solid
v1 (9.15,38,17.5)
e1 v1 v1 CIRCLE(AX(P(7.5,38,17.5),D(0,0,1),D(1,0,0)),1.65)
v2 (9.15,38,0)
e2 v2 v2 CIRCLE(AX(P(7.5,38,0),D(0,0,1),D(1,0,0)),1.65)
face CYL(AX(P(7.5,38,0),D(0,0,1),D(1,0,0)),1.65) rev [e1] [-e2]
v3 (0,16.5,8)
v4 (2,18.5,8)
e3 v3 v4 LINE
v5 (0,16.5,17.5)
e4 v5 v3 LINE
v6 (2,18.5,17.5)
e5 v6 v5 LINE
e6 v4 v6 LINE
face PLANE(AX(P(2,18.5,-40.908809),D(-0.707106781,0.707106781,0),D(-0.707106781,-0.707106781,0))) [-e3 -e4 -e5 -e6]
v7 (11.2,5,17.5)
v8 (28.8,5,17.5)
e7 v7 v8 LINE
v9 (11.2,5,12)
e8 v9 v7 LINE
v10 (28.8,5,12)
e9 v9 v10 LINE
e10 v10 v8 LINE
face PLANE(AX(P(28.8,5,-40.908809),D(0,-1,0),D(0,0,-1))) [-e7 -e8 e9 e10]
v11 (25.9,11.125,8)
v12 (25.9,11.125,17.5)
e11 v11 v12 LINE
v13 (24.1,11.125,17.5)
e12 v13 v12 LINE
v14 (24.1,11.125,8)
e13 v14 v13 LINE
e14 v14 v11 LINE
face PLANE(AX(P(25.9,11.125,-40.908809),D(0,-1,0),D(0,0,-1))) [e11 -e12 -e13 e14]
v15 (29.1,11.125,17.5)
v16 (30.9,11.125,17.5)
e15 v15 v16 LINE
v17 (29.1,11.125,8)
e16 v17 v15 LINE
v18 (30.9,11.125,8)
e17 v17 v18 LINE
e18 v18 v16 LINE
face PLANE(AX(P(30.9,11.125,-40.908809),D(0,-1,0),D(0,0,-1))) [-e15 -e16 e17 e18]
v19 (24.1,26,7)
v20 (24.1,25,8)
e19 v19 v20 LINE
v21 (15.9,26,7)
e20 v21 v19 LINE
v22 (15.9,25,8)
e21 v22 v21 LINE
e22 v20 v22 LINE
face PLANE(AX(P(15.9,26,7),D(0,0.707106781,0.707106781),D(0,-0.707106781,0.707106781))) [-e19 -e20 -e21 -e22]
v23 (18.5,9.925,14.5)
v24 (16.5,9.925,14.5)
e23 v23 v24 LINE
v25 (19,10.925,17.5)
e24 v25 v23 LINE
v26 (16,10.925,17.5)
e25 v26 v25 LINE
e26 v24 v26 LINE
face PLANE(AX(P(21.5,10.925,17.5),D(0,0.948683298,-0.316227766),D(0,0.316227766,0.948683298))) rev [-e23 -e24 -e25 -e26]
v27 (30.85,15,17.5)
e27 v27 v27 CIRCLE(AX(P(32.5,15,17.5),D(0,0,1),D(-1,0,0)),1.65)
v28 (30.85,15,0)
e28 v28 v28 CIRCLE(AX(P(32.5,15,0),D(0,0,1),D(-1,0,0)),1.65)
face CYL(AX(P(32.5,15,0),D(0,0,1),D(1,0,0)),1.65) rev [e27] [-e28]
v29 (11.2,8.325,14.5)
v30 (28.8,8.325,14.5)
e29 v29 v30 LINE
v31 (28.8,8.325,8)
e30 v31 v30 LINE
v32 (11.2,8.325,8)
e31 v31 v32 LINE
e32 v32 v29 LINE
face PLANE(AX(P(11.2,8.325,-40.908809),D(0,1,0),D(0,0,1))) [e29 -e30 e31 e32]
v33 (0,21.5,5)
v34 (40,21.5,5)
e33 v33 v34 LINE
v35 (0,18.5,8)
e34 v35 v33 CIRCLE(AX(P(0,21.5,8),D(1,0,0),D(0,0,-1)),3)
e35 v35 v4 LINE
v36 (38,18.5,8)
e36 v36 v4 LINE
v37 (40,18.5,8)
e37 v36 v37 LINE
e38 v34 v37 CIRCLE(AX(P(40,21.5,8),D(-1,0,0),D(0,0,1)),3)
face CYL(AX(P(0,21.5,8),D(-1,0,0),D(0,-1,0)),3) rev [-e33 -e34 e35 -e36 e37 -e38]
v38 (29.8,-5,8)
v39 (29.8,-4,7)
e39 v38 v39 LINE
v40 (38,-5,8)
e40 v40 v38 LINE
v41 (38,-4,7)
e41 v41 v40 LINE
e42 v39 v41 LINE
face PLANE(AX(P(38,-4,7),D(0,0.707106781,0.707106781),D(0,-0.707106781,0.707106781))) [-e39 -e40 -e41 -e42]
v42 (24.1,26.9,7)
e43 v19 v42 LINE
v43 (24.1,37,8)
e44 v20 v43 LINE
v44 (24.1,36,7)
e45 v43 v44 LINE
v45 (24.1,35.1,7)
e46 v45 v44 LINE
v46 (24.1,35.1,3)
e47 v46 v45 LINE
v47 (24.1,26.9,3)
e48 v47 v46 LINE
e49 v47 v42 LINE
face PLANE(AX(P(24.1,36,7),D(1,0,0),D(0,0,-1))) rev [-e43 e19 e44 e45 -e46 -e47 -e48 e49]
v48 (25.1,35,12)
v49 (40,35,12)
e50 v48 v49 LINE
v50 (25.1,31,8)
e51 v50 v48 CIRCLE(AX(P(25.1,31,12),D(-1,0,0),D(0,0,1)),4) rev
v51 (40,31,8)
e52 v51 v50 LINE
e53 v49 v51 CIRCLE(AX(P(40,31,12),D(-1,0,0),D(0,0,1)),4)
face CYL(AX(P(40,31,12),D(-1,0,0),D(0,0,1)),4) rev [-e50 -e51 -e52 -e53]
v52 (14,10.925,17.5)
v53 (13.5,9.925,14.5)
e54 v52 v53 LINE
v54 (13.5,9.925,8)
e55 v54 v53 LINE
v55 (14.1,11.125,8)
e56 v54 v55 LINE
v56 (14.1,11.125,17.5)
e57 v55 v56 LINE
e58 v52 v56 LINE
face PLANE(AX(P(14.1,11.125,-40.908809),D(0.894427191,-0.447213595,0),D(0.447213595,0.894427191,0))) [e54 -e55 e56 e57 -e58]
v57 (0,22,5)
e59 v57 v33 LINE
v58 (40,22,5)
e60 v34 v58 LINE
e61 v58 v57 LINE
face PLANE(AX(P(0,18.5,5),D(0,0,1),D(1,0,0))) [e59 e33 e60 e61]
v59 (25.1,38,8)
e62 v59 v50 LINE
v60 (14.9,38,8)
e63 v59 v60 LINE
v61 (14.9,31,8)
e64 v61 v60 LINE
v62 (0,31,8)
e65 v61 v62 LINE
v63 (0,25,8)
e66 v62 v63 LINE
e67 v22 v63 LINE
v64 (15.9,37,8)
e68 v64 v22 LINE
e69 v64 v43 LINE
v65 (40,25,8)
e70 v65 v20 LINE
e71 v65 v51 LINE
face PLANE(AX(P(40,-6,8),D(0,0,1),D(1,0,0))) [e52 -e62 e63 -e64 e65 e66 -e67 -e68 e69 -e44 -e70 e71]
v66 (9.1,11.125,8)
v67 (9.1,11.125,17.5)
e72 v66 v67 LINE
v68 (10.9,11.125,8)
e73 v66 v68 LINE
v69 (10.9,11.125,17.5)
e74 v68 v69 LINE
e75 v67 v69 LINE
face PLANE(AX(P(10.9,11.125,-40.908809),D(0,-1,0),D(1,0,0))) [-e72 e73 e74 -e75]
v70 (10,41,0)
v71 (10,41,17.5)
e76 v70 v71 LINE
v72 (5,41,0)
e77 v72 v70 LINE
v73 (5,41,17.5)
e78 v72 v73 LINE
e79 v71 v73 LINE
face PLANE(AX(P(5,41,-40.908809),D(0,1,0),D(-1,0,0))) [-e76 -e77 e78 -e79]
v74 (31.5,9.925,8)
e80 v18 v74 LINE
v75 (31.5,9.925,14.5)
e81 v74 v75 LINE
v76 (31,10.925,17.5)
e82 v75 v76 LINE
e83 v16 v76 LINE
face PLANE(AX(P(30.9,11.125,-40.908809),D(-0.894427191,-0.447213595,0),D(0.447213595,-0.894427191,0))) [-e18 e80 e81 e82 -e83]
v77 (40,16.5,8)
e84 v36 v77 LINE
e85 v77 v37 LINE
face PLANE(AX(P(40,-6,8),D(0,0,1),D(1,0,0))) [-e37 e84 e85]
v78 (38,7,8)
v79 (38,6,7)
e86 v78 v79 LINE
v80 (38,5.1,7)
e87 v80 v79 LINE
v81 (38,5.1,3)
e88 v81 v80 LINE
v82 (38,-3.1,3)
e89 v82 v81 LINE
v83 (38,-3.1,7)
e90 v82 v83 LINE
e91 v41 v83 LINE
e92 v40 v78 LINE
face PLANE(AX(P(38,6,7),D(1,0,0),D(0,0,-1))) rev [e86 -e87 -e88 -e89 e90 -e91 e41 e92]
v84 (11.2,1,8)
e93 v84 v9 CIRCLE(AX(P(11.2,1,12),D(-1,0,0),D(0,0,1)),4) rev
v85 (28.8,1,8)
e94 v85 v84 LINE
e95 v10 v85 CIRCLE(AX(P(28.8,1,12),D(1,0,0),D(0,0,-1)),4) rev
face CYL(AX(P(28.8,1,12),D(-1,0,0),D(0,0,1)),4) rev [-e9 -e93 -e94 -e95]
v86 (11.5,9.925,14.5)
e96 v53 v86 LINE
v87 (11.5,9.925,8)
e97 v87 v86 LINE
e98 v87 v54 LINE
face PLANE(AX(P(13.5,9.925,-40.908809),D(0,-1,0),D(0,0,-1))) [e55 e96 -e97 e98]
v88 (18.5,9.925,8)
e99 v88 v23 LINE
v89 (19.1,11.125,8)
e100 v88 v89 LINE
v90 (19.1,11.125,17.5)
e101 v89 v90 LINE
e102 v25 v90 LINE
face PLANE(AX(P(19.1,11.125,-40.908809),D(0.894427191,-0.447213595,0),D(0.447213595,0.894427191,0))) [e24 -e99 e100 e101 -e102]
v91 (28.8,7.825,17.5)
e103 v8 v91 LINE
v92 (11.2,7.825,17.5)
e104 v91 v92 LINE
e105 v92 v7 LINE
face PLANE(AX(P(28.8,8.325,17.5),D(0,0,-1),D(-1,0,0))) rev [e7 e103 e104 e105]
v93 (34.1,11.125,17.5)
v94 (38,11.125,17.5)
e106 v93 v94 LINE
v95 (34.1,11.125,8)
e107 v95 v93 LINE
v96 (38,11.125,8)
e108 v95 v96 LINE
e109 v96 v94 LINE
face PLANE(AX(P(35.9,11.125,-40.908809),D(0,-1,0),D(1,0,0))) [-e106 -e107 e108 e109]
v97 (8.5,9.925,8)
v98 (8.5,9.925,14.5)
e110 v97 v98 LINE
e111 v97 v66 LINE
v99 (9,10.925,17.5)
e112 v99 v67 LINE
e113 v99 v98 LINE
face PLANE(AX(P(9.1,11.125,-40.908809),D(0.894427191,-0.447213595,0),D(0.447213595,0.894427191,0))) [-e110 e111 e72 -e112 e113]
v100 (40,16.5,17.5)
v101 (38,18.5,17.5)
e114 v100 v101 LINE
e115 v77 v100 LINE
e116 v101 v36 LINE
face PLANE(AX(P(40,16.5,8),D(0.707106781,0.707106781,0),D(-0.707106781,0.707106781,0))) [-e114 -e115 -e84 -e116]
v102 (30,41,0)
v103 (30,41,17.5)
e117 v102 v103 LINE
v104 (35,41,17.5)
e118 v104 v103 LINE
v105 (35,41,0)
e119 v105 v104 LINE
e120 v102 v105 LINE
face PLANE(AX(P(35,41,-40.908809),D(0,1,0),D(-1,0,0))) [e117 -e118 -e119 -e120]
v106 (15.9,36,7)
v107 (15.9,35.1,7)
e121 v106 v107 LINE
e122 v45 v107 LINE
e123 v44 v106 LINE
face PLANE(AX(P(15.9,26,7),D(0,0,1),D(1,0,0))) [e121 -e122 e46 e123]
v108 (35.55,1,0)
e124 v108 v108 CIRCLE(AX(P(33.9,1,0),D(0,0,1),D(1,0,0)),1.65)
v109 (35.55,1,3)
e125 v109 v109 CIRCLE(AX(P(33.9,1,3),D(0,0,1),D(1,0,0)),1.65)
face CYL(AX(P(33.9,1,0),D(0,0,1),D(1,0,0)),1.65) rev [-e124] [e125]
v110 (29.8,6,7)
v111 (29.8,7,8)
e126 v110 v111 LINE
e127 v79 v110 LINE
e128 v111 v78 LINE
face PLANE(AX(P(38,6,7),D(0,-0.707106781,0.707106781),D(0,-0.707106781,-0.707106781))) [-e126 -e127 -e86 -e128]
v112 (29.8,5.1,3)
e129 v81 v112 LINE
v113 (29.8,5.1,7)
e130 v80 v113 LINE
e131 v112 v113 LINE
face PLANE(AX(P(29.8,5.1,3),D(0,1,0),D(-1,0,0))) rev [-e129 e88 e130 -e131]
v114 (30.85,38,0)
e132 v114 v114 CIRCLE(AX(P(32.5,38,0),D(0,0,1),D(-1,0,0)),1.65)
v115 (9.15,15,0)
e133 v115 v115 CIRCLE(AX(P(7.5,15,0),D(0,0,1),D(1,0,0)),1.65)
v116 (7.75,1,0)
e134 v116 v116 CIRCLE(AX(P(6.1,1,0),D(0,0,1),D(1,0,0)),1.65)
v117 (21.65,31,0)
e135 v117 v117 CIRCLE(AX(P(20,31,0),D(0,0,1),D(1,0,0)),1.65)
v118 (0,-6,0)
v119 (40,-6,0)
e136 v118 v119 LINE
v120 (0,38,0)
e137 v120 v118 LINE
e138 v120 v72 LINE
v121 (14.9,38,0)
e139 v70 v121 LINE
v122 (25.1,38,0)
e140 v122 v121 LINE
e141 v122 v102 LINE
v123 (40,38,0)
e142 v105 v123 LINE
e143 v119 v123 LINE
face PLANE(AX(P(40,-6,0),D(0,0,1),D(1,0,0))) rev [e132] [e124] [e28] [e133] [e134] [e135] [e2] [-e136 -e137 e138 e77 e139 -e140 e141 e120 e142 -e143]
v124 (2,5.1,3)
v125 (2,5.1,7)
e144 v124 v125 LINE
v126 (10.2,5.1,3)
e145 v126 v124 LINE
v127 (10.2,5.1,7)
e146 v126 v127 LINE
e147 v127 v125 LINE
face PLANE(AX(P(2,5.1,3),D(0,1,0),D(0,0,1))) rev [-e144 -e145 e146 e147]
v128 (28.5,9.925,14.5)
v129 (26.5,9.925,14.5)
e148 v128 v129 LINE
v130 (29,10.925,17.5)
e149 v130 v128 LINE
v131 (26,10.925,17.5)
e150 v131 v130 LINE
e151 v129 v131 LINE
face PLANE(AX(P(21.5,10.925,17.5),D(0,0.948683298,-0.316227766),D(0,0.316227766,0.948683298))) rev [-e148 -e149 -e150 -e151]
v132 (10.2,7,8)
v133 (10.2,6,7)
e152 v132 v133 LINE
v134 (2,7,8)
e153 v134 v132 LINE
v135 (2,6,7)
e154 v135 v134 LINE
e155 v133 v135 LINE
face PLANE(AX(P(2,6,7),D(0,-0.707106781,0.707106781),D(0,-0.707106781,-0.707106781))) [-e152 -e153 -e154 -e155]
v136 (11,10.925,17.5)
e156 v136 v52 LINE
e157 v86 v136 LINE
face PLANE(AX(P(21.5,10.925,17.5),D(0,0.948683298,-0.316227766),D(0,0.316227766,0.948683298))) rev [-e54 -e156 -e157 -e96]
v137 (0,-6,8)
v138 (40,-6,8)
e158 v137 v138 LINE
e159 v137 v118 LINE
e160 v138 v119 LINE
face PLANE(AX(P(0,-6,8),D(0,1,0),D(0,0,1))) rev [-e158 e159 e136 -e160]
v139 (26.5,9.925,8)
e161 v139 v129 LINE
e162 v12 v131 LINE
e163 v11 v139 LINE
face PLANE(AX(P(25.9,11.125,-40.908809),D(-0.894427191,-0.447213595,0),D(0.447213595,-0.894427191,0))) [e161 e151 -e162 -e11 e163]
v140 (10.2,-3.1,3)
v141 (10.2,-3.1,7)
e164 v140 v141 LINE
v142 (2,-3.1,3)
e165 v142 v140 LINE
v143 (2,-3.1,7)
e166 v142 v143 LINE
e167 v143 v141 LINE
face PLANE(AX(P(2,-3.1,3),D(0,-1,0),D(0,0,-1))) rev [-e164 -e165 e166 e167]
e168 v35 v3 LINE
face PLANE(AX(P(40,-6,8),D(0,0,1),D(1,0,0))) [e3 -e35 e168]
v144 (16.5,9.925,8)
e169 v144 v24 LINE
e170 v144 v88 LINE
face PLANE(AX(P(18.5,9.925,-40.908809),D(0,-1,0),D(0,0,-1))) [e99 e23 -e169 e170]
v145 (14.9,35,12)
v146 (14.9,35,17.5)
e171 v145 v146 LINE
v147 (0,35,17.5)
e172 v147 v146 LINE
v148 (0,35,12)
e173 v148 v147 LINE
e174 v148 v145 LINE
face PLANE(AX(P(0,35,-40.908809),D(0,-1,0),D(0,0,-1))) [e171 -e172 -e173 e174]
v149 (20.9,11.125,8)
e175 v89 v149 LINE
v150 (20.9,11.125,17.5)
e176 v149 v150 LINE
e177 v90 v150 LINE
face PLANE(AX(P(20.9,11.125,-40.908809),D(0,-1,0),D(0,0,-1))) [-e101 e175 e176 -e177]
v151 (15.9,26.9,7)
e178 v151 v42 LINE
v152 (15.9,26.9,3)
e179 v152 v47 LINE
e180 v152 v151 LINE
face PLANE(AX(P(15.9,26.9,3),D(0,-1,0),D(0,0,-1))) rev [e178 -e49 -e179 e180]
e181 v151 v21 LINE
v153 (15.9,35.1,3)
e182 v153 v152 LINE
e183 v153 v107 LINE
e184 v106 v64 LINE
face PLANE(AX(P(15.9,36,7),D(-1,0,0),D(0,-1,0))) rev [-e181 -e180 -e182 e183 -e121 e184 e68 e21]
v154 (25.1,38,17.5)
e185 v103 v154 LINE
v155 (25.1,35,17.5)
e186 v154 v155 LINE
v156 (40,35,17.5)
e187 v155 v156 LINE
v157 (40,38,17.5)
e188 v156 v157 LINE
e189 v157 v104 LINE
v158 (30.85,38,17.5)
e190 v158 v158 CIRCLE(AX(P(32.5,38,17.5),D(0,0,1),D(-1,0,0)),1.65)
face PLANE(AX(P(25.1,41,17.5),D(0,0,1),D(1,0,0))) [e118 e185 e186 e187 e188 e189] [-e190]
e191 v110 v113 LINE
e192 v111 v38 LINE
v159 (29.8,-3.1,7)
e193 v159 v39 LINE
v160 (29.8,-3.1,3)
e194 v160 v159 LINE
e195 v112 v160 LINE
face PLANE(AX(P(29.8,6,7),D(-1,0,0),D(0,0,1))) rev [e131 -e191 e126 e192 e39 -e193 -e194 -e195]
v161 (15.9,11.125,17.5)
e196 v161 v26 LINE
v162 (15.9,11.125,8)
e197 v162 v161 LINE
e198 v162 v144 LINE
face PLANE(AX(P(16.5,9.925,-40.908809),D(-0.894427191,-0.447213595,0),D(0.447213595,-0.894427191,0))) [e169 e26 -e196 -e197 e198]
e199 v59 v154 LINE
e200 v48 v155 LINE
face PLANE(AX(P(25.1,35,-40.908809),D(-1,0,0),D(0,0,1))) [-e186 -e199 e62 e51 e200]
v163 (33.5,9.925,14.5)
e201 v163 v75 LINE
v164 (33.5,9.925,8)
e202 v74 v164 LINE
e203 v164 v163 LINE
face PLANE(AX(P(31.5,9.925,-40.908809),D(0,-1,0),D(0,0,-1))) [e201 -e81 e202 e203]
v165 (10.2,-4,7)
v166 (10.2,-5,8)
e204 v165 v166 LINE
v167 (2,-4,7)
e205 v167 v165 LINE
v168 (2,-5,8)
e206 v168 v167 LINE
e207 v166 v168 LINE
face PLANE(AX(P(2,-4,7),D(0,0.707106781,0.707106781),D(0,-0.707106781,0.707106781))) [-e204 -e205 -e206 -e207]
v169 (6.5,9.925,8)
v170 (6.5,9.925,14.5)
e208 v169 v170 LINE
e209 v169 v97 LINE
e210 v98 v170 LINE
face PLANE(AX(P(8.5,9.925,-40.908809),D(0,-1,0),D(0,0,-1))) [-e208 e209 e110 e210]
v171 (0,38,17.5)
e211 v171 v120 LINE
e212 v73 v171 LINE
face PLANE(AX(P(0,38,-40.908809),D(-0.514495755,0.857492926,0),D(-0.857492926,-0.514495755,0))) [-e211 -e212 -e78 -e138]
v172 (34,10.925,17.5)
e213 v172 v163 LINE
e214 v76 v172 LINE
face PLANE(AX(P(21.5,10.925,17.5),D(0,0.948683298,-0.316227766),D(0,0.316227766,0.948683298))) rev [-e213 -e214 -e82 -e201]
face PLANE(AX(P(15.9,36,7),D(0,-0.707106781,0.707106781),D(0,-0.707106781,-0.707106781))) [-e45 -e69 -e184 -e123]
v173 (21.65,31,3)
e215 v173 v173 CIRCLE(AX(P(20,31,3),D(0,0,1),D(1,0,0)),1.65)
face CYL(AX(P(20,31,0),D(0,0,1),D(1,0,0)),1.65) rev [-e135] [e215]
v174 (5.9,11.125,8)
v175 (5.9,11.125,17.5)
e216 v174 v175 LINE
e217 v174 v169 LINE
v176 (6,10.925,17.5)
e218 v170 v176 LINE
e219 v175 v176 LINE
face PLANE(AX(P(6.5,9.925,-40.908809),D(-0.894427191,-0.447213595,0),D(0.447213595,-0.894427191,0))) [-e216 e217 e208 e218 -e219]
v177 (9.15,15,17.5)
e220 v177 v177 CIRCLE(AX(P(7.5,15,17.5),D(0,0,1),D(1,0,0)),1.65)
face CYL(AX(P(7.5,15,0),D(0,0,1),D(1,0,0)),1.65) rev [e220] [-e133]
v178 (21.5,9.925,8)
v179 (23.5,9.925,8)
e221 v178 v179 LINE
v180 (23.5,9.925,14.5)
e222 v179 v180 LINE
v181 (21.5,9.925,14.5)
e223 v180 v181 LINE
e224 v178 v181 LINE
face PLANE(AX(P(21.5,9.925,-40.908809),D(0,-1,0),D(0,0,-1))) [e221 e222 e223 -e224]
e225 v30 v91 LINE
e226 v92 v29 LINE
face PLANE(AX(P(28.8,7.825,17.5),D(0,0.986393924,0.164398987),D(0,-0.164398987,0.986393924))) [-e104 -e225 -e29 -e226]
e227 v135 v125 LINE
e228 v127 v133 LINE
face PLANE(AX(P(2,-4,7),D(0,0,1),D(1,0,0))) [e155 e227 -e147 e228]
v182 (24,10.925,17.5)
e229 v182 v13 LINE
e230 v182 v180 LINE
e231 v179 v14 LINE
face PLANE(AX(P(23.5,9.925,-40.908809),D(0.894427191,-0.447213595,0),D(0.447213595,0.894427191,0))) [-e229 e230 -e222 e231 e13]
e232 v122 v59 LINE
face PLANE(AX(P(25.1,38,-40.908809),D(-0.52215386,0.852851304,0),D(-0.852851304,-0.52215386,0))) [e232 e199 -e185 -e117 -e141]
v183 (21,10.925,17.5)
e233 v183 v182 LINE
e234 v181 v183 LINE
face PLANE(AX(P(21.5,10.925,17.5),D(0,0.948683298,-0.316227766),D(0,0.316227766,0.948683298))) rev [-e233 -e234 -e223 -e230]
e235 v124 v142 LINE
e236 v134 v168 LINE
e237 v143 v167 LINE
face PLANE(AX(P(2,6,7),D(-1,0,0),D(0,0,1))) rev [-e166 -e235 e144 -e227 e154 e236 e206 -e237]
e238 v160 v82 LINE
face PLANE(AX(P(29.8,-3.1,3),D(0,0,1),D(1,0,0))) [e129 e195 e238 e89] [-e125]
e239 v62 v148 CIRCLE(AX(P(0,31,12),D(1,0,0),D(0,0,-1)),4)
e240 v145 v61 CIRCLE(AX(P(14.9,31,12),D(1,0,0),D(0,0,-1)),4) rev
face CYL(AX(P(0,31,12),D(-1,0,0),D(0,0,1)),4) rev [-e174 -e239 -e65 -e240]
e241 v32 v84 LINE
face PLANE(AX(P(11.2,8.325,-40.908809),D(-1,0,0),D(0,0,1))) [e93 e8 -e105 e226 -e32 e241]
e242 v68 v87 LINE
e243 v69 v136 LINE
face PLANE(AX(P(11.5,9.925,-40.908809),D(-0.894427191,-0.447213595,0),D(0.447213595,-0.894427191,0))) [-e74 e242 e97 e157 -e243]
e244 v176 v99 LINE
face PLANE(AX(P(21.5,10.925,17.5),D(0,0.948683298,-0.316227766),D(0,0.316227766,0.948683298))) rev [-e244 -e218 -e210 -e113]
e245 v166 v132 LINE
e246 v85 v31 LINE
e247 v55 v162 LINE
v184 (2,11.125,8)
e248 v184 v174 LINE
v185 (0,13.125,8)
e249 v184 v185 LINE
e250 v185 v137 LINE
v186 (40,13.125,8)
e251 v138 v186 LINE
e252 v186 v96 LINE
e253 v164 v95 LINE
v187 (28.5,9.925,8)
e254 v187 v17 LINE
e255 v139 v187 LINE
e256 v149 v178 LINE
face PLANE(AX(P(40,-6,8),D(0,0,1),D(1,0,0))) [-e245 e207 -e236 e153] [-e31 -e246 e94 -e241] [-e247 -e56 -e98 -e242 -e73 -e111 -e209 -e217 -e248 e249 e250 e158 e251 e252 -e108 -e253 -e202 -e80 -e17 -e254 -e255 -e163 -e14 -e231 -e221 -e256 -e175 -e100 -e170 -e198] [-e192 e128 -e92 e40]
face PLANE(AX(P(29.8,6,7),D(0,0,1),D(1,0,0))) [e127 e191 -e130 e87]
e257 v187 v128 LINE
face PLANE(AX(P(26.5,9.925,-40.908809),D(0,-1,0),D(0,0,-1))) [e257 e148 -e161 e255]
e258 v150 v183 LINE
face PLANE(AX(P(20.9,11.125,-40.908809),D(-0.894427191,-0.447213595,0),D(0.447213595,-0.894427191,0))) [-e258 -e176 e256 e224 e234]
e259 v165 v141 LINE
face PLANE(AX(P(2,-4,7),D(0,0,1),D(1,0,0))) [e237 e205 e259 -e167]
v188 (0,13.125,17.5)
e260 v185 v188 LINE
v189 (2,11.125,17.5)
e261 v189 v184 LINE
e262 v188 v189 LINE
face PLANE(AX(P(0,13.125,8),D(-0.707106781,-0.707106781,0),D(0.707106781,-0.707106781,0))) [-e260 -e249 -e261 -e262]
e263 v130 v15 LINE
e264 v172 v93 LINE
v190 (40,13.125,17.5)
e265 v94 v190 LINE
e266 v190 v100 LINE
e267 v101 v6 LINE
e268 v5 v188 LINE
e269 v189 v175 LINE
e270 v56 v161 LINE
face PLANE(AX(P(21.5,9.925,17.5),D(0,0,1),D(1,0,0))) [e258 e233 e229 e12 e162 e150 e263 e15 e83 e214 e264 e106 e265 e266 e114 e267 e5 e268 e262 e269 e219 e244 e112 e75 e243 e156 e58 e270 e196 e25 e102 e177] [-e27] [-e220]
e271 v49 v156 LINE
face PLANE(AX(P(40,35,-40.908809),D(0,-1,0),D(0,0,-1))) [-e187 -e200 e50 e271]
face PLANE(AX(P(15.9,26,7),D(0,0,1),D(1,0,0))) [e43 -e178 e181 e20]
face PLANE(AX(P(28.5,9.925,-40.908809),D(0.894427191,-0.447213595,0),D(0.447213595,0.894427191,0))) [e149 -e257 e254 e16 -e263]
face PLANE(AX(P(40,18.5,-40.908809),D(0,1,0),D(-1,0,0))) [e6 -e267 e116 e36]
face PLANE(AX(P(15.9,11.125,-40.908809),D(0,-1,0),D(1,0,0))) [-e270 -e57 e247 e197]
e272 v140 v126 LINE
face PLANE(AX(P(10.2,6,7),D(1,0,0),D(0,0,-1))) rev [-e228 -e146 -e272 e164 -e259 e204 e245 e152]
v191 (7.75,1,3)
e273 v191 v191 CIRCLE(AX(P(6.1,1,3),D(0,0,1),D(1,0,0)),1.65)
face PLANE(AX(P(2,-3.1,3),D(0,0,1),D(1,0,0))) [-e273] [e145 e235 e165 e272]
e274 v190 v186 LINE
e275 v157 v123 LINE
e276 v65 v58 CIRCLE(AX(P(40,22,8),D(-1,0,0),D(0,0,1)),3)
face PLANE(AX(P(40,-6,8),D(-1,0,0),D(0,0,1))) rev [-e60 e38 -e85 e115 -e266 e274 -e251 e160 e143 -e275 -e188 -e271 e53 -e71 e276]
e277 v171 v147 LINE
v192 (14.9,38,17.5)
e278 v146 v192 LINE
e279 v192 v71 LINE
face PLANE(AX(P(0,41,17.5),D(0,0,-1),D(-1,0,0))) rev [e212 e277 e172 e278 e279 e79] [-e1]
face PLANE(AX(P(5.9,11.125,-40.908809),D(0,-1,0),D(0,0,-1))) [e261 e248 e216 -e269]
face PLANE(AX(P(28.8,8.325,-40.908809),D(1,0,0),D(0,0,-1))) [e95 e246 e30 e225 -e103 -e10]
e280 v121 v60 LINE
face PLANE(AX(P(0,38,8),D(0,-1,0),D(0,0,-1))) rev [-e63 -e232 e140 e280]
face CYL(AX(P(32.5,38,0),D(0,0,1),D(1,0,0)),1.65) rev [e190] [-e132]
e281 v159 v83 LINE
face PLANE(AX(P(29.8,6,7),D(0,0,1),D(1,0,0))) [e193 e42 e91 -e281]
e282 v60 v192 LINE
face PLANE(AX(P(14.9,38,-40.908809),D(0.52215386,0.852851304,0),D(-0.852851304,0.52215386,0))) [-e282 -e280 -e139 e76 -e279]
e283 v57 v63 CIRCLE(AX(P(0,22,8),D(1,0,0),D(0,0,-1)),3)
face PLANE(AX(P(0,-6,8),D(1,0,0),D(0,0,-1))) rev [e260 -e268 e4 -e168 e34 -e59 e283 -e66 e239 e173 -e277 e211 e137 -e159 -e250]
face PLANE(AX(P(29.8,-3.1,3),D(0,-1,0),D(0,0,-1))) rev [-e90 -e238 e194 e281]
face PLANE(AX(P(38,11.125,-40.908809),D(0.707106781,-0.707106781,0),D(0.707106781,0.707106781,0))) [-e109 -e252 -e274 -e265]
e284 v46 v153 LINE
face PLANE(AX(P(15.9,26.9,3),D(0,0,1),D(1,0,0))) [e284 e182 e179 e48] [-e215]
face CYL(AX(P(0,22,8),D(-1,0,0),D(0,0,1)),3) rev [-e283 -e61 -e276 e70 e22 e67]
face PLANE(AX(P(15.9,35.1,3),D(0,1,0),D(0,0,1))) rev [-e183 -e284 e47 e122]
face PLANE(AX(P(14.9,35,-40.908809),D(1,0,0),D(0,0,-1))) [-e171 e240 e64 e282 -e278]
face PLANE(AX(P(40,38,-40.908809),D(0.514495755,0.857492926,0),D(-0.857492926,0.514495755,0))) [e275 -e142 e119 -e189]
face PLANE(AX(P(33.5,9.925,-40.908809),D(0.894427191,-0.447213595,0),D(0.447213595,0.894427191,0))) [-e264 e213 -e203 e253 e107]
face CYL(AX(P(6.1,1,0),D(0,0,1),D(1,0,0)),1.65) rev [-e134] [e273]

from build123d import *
from OCP.BRepFilletAPI import BRepFilletAPI_MakeChamfer

# Parameters (mm, degrees)
SKETCH1_W                       = 40
SKETCH1_H                       = 44
BOSS_EXTRUDE1_DEPTH             = 8
SKETCH2_W                       = 8.2
SKETCH2_H                       = 10
CUT_EXTRUDE1_DEPTH              = 1
SKETCH3_W                       = 8.2
SKETCH3_H                       = 8.2
CUT_EXTRUDE2_DEPTH              = 4
CHAMFER1_SIZE                   = 1
SKETCH4_R                       = 1.65
CUT_EXTRUDE3_DEPTH              = 56.398555938
SKETCH5_W                       = 17.6
SKETCH5_H                       = 3.325
BOSS_EXTRUDE2_DEPTH             = 9.5
BOSS_EXTRUDE2_DIRECTION_2_REACH = 57.749
FILLET1_R                       = 4
SKETCH6_R                       = 1.65
CUT_EXTRUDE4_DEPTH              = 60.893655758
CHAMFER2_SIZE                   = 2
SKETCH7_W                       = 40
SKETCH7_H                       = 6.5
CUT_EXTRUDE5_DEPTH              = 3
FILLET2_R                       = 3
CHAMFER3_SIZE                   = 3
CHAMFER3_SIZE2                  = 1
CHAMFER4_SIZE                   = 3
CHAMFER4_SIZE2                  = 0.5


with BuildPart() as part:
    # Sketch1 → Boss-Extrude1 (new body)
    with BuildSketch(Plane.XY):
        with Locations((20, 16)):
            Rectangle(SKETCH1_W, SKETCH1_H)
    extrude(amount=BOSS_EXTRUDE1_DEPTH)

    # Sketch2 → Cut-Extrude1 (cut)
    with BuildSketch(Plane.XY.offset(8)):
        with Locations((20, 31)):
            Rectangle(SKETCH2_W, SKETCH2_H)
        with Locations((6.1, 1)):
            Rectangle(SKETCH2_W, SKETCH2_H)
        with Locations((33.9, 1)):
            Rectangle(SKETCH2_W, SKETCH2_H)
    extrude(amount=-CUT_EXTRUDE1_DEPTH, mode=Mode.SUBTRACT)

    # Sketch3 → Cut-Extrude2 (cut)
    with BuildSketch(Plane.XY.offset(7)):
        with Locations((20, 31)):
            Rectangle(SKETCH3_W, SKETCH3_H)
        with Locations((6.1, 1)):
            Rectangle(SKETCH3_W, SKETCH3_H)
        with Locations((33.9, 1)):
            Rectangle(SKETCH3_W, SKETCH3_H)
    extrude(amount=-CUT_EXTRUDE2_DEPTH, mode=Mode.SUBTRACT)

    # Chamfer1
    chamfer1_edges = [part.edges().sort_by_distance(p)[0] for p in [
        (20, 26, 8),
        (20, 36, 8),
        (33.9, -4, 8),
        (33.9, 6, 8),
        (6.1, -4, 8),
        (6.1, 6, 8),
    ]]
    chamfer(chamfer1_edges, length=CHAMFER1_SIZE - 0.0001)  # a hair under: the kernel refuses the full size

    # Sketch4 → Cut-Extrude3 (cut, through all)
    with BuildSketch(Plane.XY.offset(3)):
        with Locations((20, 31)):
            Circle(SKETCH4_R)
        with Locations((6.1, 1)):
            Circle(SKETCH4_R)
        with Locations((33.9, 1)):
            Circle(SKETCH4_R)
    extrude(amount=-CUT_EXTRUDE3_DEPTH, mode=Mode.SUBTRACT)

    # Sketch5 → Boss-Extrude2 (add)
    with BuildSketch(Plane.XY.offset(8)):
        Polygon((20.9, 11.125), (19.1, 11.125), (18.5, 9.925), (16.5, 9.925), (15.9, 11.125), (14.1, 11.125), (13.5, 9.925), (11.5, 9.925), (10.9, 11.125), (9.1, 11.125), (8.5, 9.925), (6.5, 9.925), (5.9, 11.125), (4.1, 11.125), (0, 11.125), (0, 18.5), (40, 18.5), (40, 11.125), (35.9, 11.125), (34.1, 11.125), (33.5, 9.925), (31.5, 9.925), (30.9, 11.125), (29.1, 11.125), (28.5, 9.925), (26.5, 9.925), (25.9, 11.125), (24.1, 11.125), (23.5, 9.925), (21.5, 9.925), align=None)
        with Locations((20, 6.6625)):
            Rectangle(SKETCH5_W, SKETCH5_H)
        Polygon((0, 35), (14.9, 35), (14.9, 38), (10, 41), (5, 41), (0, 38), align=None)
        Polygon((25.1, 38), (30, 41), (35, 41), (40, 38), (40, 35), (25.1, 35), align=None)
    extrude(amount=BOSS_EXTRUDE2_DEPTH)

    # Boss-Extrude2 direction 2: up to this face of the body (flat: up to its plane)
    boss_extrude2_direction_2_end = Plane(part.part.faces().sort_by_distance((20, 16.073973219, 0))[0])
    # Sketch5 → Boss-Extrude2 direction 2 (add, up to the picked face)
    with BuildSketch(Plane.XY.offset(8), mode=Mode.PRIVATE) as boss_extrude2_direction_2_sk1:
        Polygon((20.9, 11.125), (19.1, 11.125), (18.5, 9.925), (16.5, 9.925), (15.9, 11.125), (14.1, 11.125), (13.5, 9.925), (11.5, 9.925), (10.9, 11.125), (9.1, 11.125), (8.5, 9.925), (6.5, 9.925), (5.9, 11.125), (4.1, 11.125), (0, 11.125), (0, 18.5), (40, 18.5), (40, 11.125), (35.9, 11.125), (34.1, 11.125), (33.5, 9.925), (31.5, 9.925), (30.9, 11.125), (29.1, 11.125), (28.5, 9.925), (26.5, 9.925), (25.9, 11.125), (24.1, 11.125), (23.5, 9.925), (21.5, 9.925), align=None)
    boss_extrude2_direction_2_tool1 = split(extrude(boss_extrude2_direction_2_sk1.sketch, amount=-BOSS_EXTRUDE2_DIRECTION_2_REACH, mode=Mode.PRIVATE), bisect_by=boss_extrude2_direction_2_end, keep=Keep.BOTH, mode=Mode.PRIVATE)
    # Sketch5 → Boss-Extrude2 direction 2 (add, up to the picked face)
    with BuildSketch(Plane.XY.offset(8), mode=Mode.PRIVATE) as boss_extrude2_direction_2_sk2:
        with Locations((20, 6.6625)):
            Rectangle(SKETCH5_W, SKETCH5_H)
    boss_extrude2_direction_2_tool2 = split(extrude(boss_extrude2_direction_2_sk2.sketch, amount=-BOSS_EXTRUDE2_DIRECTION_2_REACH, mode=Mode.PRIVATE), bisect_by=boss_extrude2_direction_2_end, keep=Keep.BOTH, mode=Mode.PRIVATE)
    # Sketch5 → Boss-Extrude2 direction 2 (add, up to the picked face)
    with BuildSketch(Plane.XY.offset(8), mode=Mode.PRIVATE) as boss_extrude2_direction_2_sk3:
        Polygon((0, 35), (14.9, 35), (14.9, 38), (10, 41), (5, 41), (0, 38), align=None)
    boss_extrude2_direction_2_tool3 = split(extrude(boss_extrude2_direction_2_sk3.sketch, amount=-BOSS_EXTRUDE2_DIRECTION_2_REACH, mode=Mode.PRIVATE), bisect_by=boss_extrude2_direction_2_end, keep=Keep.BOTH, mode=Mode.PRIVATE)
    # Sketch5 → Boss-Extrude2 direction 2 (add, up to the picked face)
    with BuildSketch(Plane.XY.offset(8), mode=Mode.PRIVATE) as boss_extrude2_direction_2_sk4:
        Polygon((25.1, 38), (30, 41), (35, 41), (40, 38), (40, 35), (25.1, 35), align=None)
    boss_extrude2_direction_2_tool4 = split(extrude(boss_extrude2_direction_2_sk4.sketch, amount=-BOSS_EXTRUDE2_DIRECTION_2_REACH, mode=Mode.PRIVATE), bisect_by=boss_extrude2_direction_2_end, keep=Keep.BOTH, mode=Mode.PRIVATE)
    add(boss_extrude2_direction_2_tool1.solids().sort_by(Axis((20, 14.559414, 8), (0, 0, -1)))[0])
    add(boss_extrude2_direction_2_tool2.solids().sort_by(Axis((20, 6.6625, 8), (0, 0, -1)))[0])
    add(boss_extrude2_direction_2_tool3.solids().sort_by(Axis((7.45835, 37.60161, 8), (0, 0, -1)))[0])
    add(boss_extrude2_direction_2_tool4.solids().sort_by(Axis((32.54165, 37.60161, 8), (0, 0, -1)))[0])

    # Fillet1
    fillet1_edges = [part.edges().sort_by_distance(p)[0] for p in [
        (20, 5, 8),
        (7.45, 35, 8),
        (32.55, 35, 8),
    ]]
    fillet(fillet1_edges, radius=FILLET1_R)

    # Sketch6 → Cut-Extrude4 (cut, through all)
    with BuildSketch(Plane.XY.offset(17.5)):
        with Locations((7.5, 38)):
            Circle(SKETCH6_R)
        with Locations((7.5, 15)):
            Circle(SKETCH6_R)
        with Locations(Location((32.5, 38, 0), (0, 0, 180))):
            Circle(SKETCH6_R)
        with Locations(Location((32.5, 15, 0), (0, 0, 180))):
            Circle(SKETCH6_R)
    extrude(amount=-CUT_EXTRUDE4_DEPTH, mode=Mode.SUBTRACT)

    # Chamfer2
    chamfer2_edges = [part.edges().sort_by_distance(p)[0] for p in [
        (0, 11.125, 12.75),
        (0, 18.5, 12.75),
        (40, 18.5, 12.75),
        (40, 11.125, 12.75),
    ]]
    chamfer(chamfer2_edges, length=CHAMFER2_SIZE)

    # Sketch7 → Cut-Extrude5 (cut)
    with BuildSketch(Plane.XY.offset(8)):
        with Locations((20, 21.75)):
            Rectangle(SKETCH7_W, SKETCH7_H)
    extrude(amount=-CUT_EXTRUDE5_DEPTH, mode=Mode.SUBTRACT)

    # Fillet2
    fillet2_edges = [part.edges().sort_by_distance(p)[0] for p in [
        (20, 18.5, 5),
        (20, 25, 5),
    ]]
    fillet(fillet2_edges, radius=FILLET2_R - 0.0001)  # a hair under: the kernel refuses the full size

    # Chamfer3: one chamfer whose edges measure the first distance from different faces: ONE call of the kernel's chamfer builder (chamfer() names one face for all edges)
    chamfer3_edges_1 = [part.edges().sort_by_distance(p)[0] for p in [
        (22.5, 9.925, 17.5),
    ]]
    chamfer3_side_1 = [part.faces().sort_by_distance(p)[0] for p in [
        (22.5, 9.925, 12.75),
    ]]
    chamfer3_edges_2 = [part.edges().sort_by_distance(p)[0] for p in [
        (27.5, 9.925, 17.5),
    ]]
    chamfer3_side_2 = [part.faces().sort_by_distance(p)[0] for p in [
        (27.5, 9.925, 12.75),
    ]]
    chamfer3_edges_3 = [part.edges().sort_by_distance(p)[0] for p in [
        (32.5, 9.925, 17.5),
    ]]
    chamfer3_side_3 = [part.faces().sort_by_distance(p)[0] for p in [
        (32.5, 9.925, 12.75),
    ]]
    chamfer3_edges_4 = [part.edges().sort_by_distance(p)[0] for p in [
        (7.5, 9.925, 17.5),
    ]]
    chamfer3_side_4 = [part.faces().sort_by_distance(p)[0] for p in [
        (7.5, 9.925, 12.75),
    ]]
    chamfer3_edges_5 = [part.edges().sort_by_distance(p)[0] for p in [
        (12.5, 9.925, 17.5),
    ]]
    chamfer3_side_5 = [part.faces().sort_by_distance(p)[0] for p in [
        (12.5, 9.925, 12.75),
    ]]
    chamfer3_edges_6 = [part.edges().sort_by_distance(p)[0] for p in [
        (17.5, 9.925, 17.5),
    ]]
    chamfer3_side_6 = [part.faces().sort_by_distance(p)[0] for p in [
        (17.5, 9.925, 12.75),
    ]]
    chamfer3 = BRepFilletAPI_MakeChamfer(part.part.solid().wrapped)
    for e in chamfer3_edges_1:
        chamfer3.Add(CHAMFER3_SIZE, CHAMFER3_SIZE2, e.wrapped, chamfer3_side_1[0].wrapped)  # the first distance lies on this face
    for e in chamfer3_edges_2:
        chamfer3.Add(CHAMFER3_SIZE, CHAMFER3_SIZE2, e.wrapped, chamfer3_side_2[0].wrapped)  # the first distance lies on this face
    for e in chamfer3_edges_3:
        chamfer3.Add(CHAMFER3_SIZE, CHAMFER3_SIZE2, e.wrapped, chamfer3_side_3[0].wrapped)  # the first distance lies on this face
    for e in chamfer3_edges_4:
        chamfer3.Add(CHAMFER3_SIZE, CHAMFER3_SIZE2, e.wrapped, chamfer3_side_4[0].wrapped)  # the first distance lies on this face
    for e in chamfer3_edges_5:
        chamfer3.Add(CHAMFER3_SIZE, CHAMFER3_SIZE2, e.wrapped, chamfer3_side_5[0].wrapped)  # the first distance lies on this face
    for e in chamfer3_edges_6:
        chamfer3.Add(CHAMFER3_SIZE, CHAMFER3_SIZE2, e.wrapped, chamfer3_side_6[0].wrapped)  # the first distance lies on this face
    add(Compound.cast(chamfer3.Shape()), mode=Mode.REPLACE)

    # Chamfer4
    chamfer4_edges = [part.edges().sort_by_distance(p)[0] for p in [
        (20, 8.325, 17.5),
    ]]
    chamfer4_side = [part.faces().sort_by_distance(p)[0] for p in [
        (20, 8.325, 12.75),
    ]]
    chamfer(chamfer4_edges, length=CHAMFER4_SIZE, length2=CHAMFER4_SIZE2, reference=chamfer4_side[0])


solid = part.part
